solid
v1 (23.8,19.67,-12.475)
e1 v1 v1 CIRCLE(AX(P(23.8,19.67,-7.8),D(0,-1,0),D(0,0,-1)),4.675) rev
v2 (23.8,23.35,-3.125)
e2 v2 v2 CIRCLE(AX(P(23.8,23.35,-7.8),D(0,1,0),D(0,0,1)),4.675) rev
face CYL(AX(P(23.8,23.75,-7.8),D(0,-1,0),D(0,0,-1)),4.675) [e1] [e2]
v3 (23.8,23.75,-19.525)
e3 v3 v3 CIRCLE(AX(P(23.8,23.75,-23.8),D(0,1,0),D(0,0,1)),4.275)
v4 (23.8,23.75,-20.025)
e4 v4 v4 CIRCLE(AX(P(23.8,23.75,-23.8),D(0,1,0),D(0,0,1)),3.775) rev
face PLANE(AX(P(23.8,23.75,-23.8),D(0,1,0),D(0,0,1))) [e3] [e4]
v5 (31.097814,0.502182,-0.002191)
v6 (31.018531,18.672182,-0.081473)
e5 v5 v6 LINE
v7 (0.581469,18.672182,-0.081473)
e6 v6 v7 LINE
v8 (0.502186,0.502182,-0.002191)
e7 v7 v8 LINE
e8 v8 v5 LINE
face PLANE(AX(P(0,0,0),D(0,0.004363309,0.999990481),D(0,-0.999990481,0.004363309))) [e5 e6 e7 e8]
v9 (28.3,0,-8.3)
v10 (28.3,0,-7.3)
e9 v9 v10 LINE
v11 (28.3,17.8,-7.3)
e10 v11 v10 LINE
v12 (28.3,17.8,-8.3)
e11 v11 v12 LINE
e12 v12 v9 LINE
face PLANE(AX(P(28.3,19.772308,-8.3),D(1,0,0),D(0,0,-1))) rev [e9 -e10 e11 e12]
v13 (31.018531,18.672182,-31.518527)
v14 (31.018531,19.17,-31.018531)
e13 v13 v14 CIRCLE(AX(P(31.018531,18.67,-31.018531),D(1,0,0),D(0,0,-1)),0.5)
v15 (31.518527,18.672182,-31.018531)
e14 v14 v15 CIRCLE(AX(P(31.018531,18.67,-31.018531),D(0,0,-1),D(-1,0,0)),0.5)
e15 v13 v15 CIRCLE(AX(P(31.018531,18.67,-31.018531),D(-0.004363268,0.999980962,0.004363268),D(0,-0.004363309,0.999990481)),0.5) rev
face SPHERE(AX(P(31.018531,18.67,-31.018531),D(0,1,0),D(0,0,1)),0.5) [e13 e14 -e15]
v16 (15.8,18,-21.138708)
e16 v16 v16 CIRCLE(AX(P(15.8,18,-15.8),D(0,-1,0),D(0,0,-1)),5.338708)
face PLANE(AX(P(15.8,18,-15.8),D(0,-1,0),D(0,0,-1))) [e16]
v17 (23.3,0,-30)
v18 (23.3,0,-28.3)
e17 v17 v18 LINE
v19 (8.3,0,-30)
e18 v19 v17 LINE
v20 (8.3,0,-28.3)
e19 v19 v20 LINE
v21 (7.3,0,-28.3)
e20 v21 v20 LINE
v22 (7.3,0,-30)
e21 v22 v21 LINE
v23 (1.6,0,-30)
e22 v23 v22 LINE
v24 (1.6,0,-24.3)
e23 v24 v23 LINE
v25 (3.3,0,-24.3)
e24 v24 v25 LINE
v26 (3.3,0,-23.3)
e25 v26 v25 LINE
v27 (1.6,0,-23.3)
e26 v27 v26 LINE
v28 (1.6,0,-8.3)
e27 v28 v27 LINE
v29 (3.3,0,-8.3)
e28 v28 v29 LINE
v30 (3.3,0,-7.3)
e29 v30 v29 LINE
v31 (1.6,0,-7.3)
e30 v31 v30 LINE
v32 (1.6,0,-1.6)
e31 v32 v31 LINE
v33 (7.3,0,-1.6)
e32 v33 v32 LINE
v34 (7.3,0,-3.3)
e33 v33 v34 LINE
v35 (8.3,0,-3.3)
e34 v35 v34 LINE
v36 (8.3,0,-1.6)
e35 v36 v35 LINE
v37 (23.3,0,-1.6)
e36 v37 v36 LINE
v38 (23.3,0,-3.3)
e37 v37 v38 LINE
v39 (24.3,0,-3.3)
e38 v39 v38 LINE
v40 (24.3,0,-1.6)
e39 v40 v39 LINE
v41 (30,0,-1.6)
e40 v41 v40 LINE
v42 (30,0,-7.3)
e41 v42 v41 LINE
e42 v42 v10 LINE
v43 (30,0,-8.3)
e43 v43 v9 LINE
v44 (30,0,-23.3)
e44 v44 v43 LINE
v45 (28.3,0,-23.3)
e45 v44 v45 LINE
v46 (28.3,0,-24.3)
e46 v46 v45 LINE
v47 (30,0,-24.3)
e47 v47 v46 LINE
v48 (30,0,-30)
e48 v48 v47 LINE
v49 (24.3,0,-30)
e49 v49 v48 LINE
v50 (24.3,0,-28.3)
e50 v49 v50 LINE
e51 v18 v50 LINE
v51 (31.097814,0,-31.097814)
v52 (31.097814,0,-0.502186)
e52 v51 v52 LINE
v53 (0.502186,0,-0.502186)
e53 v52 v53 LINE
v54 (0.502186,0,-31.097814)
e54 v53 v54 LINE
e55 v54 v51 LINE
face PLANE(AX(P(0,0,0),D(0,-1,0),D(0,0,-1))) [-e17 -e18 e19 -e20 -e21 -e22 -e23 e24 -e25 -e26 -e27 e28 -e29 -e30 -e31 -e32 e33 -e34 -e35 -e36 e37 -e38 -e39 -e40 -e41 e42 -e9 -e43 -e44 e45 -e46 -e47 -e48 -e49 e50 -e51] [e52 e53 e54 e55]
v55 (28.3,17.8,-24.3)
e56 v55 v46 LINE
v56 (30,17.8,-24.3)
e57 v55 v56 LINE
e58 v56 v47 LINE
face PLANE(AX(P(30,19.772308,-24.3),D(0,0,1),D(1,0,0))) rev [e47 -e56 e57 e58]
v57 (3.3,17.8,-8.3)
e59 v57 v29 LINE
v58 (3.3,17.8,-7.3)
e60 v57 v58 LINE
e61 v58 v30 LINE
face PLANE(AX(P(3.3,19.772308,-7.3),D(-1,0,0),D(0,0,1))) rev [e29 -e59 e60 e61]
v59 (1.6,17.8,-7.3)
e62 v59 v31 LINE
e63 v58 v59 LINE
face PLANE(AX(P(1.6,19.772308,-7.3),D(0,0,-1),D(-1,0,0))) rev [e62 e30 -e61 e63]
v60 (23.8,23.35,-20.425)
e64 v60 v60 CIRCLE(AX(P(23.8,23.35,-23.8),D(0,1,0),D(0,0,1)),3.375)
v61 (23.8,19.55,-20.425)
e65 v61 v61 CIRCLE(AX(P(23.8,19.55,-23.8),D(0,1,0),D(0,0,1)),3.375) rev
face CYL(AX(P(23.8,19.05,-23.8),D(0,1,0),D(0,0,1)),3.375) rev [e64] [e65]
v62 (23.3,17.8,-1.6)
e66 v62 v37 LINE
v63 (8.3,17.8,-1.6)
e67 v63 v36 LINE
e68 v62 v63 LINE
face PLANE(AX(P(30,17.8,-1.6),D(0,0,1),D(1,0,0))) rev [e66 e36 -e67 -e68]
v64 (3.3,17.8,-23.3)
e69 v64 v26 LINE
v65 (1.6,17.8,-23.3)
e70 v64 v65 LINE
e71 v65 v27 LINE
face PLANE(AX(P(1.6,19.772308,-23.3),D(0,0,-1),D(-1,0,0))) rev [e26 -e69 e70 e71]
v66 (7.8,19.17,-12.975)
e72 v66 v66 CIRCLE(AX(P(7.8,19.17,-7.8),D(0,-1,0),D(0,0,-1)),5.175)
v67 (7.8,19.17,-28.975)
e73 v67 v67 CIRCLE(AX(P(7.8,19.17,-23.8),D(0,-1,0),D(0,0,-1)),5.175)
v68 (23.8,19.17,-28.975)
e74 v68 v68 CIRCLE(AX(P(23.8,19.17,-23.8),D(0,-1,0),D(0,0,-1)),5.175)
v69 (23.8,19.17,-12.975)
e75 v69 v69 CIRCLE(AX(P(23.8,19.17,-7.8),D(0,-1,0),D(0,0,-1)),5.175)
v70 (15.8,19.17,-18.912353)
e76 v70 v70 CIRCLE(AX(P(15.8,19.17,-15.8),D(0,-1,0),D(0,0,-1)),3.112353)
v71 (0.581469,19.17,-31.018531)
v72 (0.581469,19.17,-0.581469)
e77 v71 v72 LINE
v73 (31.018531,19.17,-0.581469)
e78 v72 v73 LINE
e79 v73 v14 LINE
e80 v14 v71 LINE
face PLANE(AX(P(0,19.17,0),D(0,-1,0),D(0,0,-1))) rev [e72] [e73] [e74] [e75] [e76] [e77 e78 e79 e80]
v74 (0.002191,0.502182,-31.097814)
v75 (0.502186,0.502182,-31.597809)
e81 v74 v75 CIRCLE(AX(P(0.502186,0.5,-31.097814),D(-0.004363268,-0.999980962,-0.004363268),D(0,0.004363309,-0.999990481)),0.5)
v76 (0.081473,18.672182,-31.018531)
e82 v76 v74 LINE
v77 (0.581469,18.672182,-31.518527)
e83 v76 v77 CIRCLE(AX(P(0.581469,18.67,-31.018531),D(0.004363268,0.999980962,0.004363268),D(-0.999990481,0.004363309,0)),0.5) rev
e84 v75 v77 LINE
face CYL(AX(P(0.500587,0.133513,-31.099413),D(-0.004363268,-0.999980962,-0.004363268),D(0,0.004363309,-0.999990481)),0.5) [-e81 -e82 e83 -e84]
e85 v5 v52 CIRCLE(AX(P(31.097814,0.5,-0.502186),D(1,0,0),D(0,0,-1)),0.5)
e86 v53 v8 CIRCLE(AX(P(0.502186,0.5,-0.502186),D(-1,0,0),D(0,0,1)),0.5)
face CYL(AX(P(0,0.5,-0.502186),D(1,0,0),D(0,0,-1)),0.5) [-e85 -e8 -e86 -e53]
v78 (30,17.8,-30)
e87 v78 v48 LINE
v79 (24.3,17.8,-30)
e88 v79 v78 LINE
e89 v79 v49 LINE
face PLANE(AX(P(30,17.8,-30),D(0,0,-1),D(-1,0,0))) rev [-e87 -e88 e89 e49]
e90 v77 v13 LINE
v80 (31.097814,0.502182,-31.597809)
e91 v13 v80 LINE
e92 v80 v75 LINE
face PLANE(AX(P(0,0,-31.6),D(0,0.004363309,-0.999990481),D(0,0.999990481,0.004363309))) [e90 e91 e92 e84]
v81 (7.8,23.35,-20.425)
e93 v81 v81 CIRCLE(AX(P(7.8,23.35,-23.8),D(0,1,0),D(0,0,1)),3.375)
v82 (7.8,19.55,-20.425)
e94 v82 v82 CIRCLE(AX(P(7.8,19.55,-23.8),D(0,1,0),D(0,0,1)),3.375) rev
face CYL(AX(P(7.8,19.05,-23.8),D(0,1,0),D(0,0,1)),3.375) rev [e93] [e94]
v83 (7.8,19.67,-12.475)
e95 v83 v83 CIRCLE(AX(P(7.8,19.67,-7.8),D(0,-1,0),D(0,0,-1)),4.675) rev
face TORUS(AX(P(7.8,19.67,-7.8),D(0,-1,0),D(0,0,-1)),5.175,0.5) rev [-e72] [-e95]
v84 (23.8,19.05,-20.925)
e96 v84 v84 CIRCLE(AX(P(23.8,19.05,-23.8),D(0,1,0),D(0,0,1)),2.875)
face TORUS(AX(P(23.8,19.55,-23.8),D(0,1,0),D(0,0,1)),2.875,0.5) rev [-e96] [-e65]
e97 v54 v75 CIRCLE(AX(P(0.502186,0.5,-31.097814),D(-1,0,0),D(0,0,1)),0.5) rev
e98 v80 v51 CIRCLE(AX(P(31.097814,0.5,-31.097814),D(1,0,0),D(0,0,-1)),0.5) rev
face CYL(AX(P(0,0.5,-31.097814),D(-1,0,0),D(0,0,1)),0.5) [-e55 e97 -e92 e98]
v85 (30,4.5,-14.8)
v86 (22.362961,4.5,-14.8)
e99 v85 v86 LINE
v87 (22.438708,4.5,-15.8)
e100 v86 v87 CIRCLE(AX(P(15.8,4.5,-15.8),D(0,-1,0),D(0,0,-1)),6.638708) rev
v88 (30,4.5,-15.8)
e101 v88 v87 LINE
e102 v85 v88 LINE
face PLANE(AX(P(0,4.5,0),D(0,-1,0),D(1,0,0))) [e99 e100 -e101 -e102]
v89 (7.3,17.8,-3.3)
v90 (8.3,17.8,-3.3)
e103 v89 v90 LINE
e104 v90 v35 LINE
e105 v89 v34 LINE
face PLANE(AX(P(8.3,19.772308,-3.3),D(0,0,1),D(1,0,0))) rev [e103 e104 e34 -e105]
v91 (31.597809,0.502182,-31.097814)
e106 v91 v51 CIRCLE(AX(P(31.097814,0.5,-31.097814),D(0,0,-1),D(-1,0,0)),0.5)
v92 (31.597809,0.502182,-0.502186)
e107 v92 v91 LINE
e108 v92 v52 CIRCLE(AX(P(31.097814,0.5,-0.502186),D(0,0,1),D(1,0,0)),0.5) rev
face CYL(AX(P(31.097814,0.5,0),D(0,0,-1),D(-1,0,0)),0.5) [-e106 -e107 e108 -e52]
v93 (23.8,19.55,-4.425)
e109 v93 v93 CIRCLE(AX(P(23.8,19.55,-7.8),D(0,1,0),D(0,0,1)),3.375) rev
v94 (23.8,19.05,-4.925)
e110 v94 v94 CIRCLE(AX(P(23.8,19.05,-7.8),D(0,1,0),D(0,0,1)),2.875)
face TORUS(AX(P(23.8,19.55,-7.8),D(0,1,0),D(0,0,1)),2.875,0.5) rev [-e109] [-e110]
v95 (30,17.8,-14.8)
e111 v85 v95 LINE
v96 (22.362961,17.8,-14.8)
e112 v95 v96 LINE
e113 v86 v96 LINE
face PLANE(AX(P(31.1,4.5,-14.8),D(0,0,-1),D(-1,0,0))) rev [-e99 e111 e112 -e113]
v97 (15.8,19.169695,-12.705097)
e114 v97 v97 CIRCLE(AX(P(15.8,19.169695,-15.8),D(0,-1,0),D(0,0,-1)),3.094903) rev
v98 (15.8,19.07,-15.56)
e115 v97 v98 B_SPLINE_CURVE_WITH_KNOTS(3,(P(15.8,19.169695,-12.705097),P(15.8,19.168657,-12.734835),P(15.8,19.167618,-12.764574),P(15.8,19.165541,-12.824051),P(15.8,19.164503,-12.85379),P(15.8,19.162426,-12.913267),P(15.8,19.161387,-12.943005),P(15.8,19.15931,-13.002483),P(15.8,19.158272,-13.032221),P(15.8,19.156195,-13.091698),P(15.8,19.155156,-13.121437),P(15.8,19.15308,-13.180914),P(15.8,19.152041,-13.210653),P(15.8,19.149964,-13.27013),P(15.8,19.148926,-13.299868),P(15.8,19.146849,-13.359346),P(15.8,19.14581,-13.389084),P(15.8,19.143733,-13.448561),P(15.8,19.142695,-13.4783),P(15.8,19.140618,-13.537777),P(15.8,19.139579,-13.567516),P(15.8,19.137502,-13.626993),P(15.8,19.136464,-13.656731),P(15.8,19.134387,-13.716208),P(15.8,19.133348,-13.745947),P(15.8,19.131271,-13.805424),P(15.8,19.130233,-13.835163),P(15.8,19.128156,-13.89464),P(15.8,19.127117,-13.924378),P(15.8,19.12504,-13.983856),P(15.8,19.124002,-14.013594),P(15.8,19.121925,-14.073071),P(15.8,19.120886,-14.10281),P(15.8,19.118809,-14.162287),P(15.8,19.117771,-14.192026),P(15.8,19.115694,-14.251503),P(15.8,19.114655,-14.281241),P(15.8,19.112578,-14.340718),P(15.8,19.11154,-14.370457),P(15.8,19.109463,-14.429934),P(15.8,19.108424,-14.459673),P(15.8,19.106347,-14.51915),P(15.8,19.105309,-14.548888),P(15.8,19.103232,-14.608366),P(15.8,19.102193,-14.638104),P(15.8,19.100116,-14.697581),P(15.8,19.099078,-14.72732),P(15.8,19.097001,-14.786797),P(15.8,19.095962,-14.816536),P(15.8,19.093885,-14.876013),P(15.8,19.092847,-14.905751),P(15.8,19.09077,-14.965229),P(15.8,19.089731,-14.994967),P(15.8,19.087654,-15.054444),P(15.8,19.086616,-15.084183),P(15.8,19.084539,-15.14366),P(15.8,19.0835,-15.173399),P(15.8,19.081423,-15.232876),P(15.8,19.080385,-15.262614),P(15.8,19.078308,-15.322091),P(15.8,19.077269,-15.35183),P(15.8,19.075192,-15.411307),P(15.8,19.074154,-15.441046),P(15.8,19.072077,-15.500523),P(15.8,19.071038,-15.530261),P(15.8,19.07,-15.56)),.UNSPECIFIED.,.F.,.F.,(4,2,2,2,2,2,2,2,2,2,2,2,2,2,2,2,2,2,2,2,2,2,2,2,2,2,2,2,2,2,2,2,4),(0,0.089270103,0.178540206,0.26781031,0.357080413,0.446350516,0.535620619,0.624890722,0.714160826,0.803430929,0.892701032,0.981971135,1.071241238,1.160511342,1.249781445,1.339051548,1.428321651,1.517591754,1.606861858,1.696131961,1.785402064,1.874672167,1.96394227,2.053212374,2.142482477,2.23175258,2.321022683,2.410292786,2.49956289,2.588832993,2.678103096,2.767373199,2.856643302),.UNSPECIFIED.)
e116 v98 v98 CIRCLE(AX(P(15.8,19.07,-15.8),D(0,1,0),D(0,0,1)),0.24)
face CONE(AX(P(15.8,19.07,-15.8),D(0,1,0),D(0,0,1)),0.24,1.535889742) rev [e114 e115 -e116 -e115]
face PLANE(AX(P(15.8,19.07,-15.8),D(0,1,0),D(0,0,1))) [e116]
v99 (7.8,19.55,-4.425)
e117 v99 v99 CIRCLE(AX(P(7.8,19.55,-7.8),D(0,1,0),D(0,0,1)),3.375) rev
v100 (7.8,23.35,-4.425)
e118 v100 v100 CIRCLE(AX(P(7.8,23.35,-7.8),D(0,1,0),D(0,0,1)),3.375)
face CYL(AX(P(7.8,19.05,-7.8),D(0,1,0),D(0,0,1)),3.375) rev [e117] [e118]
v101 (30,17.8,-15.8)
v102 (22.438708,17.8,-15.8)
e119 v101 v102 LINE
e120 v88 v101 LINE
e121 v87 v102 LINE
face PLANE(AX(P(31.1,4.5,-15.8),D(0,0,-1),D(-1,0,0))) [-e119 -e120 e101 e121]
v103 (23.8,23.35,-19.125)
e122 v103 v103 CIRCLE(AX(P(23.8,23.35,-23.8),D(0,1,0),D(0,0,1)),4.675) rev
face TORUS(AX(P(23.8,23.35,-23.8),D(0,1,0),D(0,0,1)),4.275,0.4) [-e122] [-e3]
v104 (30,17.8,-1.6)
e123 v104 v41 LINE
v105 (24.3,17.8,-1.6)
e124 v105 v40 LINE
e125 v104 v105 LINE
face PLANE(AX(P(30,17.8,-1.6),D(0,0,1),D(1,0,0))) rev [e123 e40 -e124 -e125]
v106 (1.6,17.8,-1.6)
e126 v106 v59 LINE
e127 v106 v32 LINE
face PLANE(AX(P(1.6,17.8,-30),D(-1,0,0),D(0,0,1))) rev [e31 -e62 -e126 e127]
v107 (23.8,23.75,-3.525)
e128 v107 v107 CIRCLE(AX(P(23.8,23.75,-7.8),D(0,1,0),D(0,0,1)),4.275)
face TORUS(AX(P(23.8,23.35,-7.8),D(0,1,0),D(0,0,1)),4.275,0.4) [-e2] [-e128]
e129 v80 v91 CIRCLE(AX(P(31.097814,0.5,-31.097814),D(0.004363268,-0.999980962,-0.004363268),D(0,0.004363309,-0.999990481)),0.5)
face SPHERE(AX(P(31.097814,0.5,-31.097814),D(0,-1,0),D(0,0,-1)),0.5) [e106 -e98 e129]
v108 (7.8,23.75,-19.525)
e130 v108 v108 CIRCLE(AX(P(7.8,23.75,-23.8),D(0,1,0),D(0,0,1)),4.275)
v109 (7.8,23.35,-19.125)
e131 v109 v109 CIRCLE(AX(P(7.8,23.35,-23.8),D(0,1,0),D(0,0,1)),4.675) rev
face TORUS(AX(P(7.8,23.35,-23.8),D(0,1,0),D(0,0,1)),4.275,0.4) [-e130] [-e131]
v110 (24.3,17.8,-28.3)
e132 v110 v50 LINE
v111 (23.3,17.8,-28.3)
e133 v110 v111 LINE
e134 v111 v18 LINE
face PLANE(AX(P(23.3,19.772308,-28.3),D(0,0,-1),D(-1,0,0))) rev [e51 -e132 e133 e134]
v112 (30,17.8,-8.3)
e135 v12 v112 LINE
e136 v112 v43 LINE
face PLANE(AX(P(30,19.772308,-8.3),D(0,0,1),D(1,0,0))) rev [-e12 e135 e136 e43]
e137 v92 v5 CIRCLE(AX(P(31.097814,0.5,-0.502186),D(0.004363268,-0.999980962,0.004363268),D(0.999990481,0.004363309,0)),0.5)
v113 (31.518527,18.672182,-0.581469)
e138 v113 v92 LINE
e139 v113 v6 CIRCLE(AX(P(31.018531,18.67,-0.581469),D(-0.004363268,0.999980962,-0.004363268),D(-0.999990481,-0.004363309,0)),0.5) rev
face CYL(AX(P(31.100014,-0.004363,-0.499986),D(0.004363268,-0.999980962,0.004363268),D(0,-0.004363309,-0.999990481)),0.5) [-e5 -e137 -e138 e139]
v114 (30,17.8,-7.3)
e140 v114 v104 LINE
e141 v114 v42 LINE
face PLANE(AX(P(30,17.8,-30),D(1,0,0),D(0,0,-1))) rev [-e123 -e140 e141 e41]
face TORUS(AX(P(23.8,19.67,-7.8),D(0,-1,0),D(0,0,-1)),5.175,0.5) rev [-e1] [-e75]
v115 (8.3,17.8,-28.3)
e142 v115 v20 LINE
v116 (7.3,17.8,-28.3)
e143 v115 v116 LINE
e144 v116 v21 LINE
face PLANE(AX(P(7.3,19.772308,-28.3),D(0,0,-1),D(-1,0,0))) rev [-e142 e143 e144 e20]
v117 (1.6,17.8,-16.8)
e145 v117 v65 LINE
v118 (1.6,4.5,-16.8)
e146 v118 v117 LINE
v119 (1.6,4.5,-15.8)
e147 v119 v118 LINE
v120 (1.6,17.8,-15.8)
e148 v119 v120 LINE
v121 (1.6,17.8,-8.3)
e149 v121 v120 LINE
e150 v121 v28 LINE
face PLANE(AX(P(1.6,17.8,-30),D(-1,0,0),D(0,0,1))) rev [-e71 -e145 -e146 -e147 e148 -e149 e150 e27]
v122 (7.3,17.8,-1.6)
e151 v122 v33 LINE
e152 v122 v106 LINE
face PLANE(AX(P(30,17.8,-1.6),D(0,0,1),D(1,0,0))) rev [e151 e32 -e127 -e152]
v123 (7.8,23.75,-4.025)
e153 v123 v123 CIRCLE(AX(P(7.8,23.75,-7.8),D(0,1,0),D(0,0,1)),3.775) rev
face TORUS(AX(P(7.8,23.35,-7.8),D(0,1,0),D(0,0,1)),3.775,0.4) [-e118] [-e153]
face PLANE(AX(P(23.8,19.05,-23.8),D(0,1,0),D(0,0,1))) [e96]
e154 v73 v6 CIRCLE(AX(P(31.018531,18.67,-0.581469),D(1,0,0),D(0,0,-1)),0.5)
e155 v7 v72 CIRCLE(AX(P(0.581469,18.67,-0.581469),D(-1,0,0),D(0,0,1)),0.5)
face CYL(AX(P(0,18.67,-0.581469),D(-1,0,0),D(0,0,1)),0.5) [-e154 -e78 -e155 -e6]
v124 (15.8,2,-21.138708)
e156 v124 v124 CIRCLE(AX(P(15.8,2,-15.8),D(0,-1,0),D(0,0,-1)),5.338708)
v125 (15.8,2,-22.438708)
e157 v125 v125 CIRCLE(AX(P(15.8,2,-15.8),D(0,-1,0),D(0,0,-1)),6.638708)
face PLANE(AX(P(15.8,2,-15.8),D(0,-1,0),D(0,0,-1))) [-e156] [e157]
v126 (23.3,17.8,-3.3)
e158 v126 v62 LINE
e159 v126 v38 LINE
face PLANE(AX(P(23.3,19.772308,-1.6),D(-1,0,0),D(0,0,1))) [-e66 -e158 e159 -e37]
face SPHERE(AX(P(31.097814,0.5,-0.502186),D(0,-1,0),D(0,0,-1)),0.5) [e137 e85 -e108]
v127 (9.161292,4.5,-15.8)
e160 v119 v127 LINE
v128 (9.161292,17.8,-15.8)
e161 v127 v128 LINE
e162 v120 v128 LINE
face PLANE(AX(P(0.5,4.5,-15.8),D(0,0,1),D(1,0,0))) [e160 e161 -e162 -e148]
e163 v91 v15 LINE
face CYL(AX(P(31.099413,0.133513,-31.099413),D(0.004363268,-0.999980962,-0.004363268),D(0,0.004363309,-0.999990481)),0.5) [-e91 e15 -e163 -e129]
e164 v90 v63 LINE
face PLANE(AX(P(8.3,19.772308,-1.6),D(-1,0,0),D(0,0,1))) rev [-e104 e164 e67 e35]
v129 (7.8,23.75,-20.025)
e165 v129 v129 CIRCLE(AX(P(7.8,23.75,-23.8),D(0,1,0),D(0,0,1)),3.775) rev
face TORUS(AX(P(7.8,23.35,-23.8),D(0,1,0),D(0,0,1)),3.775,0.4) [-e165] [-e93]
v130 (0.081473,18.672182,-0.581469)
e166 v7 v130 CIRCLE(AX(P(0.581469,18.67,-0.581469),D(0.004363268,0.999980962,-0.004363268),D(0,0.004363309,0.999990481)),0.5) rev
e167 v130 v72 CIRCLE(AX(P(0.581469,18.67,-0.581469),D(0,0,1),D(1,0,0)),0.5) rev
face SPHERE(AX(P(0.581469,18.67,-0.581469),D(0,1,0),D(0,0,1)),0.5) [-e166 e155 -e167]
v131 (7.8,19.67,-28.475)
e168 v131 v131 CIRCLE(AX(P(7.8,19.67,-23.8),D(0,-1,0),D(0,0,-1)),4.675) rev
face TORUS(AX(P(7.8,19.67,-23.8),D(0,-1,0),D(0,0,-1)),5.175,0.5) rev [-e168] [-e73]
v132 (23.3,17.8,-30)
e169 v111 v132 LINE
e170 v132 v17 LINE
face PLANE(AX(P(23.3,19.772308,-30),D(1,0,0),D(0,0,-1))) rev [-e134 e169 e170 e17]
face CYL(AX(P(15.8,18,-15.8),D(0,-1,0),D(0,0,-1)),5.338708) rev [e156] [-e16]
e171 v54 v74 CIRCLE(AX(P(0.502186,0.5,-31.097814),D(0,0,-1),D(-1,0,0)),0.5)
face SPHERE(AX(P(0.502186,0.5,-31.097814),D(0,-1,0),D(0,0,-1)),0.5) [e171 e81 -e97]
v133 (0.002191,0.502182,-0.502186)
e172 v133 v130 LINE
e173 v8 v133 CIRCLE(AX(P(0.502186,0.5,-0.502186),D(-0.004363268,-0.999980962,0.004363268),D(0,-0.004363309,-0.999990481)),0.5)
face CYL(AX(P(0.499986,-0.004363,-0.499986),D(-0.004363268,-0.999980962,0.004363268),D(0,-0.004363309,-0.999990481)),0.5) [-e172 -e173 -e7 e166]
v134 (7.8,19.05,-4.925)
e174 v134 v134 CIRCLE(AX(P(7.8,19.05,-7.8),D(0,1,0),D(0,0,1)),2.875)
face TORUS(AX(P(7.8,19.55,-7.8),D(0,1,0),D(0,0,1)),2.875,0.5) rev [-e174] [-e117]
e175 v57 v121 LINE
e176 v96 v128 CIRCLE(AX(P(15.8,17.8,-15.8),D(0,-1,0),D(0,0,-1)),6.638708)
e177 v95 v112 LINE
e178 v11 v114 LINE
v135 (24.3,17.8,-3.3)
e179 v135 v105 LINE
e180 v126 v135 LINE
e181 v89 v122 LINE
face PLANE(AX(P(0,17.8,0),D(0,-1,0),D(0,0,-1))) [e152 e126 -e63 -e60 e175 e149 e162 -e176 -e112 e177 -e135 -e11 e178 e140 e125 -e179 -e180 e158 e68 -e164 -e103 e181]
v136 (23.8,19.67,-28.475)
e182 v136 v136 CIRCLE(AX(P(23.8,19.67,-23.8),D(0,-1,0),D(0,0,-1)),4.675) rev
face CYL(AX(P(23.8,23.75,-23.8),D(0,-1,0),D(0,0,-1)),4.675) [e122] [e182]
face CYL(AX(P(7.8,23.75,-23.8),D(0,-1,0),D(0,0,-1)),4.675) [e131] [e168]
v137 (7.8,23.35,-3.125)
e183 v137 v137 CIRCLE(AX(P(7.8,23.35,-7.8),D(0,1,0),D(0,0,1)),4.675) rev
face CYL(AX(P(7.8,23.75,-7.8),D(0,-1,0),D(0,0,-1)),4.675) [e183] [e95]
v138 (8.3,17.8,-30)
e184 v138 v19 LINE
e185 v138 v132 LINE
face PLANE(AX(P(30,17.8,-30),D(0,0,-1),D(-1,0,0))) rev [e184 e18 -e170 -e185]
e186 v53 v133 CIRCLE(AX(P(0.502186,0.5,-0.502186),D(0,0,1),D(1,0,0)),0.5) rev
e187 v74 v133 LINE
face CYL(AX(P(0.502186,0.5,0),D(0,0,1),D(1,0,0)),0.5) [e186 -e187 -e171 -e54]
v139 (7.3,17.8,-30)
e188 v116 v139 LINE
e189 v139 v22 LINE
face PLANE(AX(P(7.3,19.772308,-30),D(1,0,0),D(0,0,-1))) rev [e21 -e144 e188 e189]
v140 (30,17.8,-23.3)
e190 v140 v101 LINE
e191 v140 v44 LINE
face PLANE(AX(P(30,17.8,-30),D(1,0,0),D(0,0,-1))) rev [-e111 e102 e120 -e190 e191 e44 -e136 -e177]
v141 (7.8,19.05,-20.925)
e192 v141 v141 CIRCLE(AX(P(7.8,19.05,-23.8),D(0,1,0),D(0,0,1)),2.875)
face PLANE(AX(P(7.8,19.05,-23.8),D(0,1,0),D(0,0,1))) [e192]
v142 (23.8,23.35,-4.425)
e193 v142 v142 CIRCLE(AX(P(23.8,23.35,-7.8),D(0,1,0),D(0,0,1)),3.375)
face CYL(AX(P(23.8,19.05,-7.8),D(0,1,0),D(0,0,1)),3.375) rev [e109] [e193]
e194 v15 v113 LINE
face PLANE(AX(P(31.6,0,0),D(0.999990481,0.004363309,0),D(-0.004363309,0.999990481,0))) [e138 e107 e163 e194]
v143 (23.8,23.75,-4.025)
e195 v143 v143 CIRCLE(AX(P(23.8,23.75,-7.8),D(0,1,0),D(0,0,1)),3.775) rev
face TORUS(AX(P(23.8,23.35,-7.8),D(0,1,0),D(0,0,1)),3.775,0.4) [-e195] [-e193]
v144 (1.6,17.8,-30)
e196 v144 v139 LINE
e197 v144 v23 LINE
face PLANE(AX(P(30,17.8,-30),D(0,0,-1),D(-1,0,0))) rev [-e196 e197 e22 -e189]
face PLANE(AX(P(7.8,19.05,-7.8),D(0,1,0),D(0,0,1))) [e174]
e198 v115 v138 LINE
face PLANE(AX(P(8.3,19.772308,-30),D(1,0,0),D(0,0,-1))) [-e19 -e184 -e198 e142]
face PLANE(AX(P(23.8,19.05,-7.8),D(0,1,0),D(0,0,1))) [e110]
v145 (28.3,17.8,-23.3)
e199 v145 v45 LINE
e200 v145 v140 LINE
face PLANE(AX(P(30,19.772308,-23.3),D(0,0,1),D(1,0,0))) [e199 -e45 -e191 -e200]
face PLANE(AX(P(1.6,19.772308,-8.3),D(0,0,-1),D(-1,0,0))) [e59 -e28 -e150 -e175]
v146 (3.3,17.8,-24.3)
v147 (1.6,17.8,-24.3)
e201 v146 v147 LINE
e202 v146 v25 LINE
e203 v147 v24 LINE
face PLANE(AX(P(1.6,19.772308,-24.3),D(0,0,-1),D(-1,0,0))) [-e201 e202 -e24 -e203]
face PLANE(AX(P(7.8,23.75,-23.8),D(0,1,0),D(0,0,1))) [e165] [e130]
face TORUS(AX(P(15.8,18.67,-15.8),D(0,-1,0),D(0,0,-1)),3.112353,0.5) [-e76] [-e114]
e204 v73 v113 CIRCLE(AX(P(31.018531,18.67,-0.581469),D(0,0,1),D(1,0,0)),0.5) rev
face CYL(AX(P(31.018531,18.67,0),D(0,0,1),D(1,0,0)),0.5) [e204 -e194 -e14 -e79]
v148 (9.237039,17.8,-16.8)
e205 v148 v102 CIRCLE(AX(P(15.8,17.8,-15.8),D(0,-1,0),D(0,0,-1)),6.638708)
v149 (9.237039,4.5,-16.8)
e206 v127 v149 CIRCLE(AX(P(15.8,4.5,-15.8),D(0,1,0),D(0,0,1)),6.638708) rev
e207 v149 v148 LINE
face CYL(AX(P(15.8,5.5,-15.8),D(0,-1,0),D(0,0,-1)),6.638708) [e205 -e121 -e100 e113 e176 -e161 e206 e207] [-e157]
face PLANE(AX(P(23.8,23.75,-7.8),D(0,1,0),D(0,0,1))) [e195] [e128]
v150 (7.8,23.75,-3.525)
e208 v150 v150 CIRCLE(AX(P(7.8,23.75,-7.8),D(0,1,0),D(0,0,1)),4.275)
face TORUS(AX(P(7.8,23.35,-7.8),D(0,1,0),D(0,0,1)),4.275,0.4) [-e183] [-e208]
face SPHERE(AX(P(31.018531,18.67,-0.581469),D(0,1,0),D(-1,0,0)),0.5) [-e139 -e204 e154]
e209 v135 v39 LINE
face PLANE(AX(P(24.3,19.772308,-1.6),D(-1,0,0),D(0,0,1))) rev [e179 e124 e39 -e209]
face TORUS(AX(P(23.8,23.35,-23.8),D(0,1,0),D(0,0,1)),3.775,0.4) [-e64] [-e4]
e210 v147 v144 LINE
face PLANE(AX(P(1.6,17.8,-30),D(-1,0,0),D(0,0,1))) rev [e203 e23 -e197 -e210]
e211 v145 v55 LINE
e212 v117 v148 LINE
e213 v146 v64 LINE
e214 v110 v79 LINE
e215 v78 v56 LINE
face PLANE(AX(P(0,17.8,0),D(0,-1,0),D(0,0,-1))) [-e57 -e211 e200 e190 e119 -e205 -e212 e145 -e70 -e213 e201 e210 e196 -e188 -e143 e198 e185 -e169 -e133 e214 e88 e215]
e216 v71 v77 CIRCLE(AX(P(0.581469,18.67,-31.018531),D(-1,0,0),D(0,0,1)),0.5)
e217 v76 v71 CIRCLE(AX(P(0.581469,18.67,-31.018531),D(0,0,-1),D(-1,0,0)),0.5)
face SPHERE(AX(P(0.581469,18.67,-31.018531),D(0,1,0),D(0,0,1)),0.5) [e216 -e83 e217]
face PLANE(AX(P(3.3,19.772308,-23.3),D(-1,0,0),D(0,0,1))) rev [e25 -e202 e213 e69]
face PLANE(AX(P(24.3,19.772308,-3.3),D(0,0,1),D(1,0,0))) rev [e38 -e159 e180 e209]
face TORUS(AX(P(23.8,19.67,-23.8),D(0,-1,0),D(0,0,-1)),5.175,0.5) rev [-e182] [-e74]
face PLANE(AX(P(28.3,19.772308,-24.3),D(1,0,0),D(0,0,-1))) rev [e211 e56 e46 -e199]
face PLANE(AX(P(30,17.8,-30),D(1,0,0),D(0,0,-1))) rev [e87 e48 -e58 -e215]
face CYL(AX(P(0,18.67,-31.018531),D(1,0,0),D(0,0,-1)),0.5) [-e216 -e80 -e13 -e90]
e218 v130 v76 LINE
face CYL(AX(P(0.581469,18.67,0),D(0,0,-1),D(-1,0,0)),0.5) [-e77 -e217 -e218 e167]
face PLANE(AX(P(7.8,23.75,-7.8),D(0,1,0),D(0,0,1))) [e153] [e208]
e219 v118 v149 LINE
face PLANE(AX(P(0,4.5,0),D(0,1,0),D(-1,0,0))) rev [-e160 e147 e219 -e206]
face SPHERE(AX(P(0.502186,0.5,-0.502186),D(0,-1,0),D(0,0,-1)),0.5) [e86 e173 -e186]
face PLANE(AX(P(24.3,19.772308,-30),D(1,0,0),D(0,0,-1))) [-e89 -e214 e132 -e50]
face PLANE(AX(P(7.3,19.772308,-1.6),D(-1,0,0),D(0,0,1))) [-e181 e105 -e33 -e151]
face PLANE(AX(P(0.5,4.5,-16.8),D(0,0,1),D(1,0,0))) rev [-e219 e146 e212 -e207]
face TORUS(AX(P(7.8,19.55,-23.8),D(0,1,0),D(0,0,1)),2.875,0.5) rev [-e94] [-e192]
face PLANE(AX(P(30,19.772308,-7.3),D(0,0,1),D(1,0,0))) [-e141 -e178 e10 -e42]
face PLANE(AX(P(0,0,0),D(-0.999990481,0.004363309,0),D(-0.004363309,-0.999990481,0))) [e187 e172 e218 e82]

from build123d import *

# Parameters (mm, degrees)
SKETCH1_W           = 31.6
SKETCH1_H           = 31.6
BOSS_EXTRUDE1_DEPTH = 19.17
BOSS_EXTRUDE1_TAPER = 0.25
SKETCH2_R           = 4.675
BOSS_EXTRUDE2_DEPTH = 4.58
SKETCH3_R           = 6.638708499
CUT_EXTRUDE1_DEPTH  = 5.5
SKETCH4_R           = 6.638708499
CUT_EXTRUDE2_DEPTH  = 2
SKETCH5_R           = 3.375
CUT_EXTRUDE3_DEPTH  = 4.7
SKETCH6_R           = 5.338708499
CUT_EXTRUDE4_DEPTH  = 16
SKETCH7_W           = 28.4
SKETCH7_H           = 28.4
SKETCH7_R           = 6.638708499
CUT_EXTRUDE5_DEPTH  = 17.8
SKETCH9_W           = 1
SKETCH9_H           = 1.7
SKETCH9_W_2         = 1.7
SKETCH9_H_2         = 1
EXTRUDE_THIN1_DEPTH = 17.8
SKETCH10_W          = 9.161291501
SKETCH10_H          = 1
EXTRUDE_THIN2_DEPTH = 13.3
SKETCH12_R          = 3.24
CUT_EXTRUDE6_DEPTH  = 0.1
CHAMFER1_SIZE       = 0.104762308
CHAMFER1_SIZE_2     = 3
FILLET2_R           = 0.5
FILLET4_R           = 0.4


with BuildPart() as part:
    # Sketch1 → Boss-Extrude1 (new body)
    with BuildSketch(Plane(origin=(0, 0, 0), x_dir=(1, 0, 0), z_dir=(0, 1, 0))):
        with Locations((15.8, 15.8)):
            Rectangle(SKETCH1_W, SKETCH1_H)
    extrude(amount=BOSS_EXTRUDE1_DEPTH, taper=BOSS_EXTRUDE1_TAPER)

    # Sketch2 → Boss-Extrude2 (add)
    with BuildSketch(Plane(origin=(0, 19.17, 0), x_dir=(1, 0, 0), z_dir=(0, 1, 0))):
        with Locations(Location((7.8, 23.8, 0), (0, 0, 90))):
            Circle(SKETCH2_R)
        with Locations(Location((23.8, 7.8, 0), (0, 0, 90))):
            Circle(SKETCH2_R)
        with Locations(Location((7.8, 7.8, 0), (0, 0, 90))):
            Circle(SKETCH2_R)
        with Locations(Location((23.8, 23.8, 0), (0, 0, 90))):
            Circle(SKETCH2_R)
    extrude(amount=BOSS_EXTRUDE2_DEPTH)

    # Sketch3 → Cut-Extrude1 (cut)
    with BuildSketch(Plane.XZ):
        Polygon((6.8, -3.125), (8.8, -3.125), (9.425, -2.5), (22.175, -2.5), (22.8, -3.125), (24.8, -3.125), (25.425, -2.5), (29.1, -2.5), (29.1, -6.175), (28.475, -6.8), (28.475, -8.8), (29.1, -9.425), (29.1, -22.175), (28.475, -22.8), (28.475, -24.8), (29.1, -25.425), (29.1, -29.1), (25.425, -29.1), (24.8, -28.475), (22.8, -28.475), (22.175, -29.1), (9.425, -29.1), (8.8, -28.475), (6.8, -28.475), (6.175, -29.1), (2.5, -29.1), (2.5, -25.425), (3.125, -24.8), (3.125, -22.8), (2.5, -22.175), (2.5, -9.425), (3.125, -8.8), (3.125, -6.8), (2.5, -6.175), (2.5, -2.5), (6.175, -2.5), align=None)
        with Locations(Location((15.8, -15.8, 0), (0, 0, 270))):
            Circle(SKETCH3_R, mode=Mode.SUBTRACT)
    extrude(amount=-CUT_EXTRUDE1_DEPTH, mode=Mode.SUBTRACT)

    # Sketch4 → Cut-Extrude2 (cut)
    with BuildSketch(Plane.XZ):
        with Locations(Location((15.8, -15.8, 0), (0, 0, 270))):
            Circle(SKETCH4_R)
    extrude(amount=-CUT_EXTRUDE2_DEPTH, mode=Mode.SUBTRACT)

    # Sketch5 → Cut-Extrude3 (cut)
    with BuildSketch(Plane(origin=(0, 23.75, 0), x_dir=(1, 0, 0), z_dir=(0, 1, 0))):
        with Locations(Location((7.8, 23.8, 0), (0, 0, 270))):
            Circle(SKETCH5_R)
        with Locations(Location((23.8, 23.8, 0), (0, 0, 270))):
            Circle(SKETCH5_R)
        with Locations(Location((7.8, 7.8, 0), (0, 0, 270))):
            Circle(SKETCH5_R)
        with Locations(Location((23.8, 7.8, 0), (0, 0, 270))):
            Circle(SKETCH5_R)
    extrude(amount=-CUT_EXTRUDE3_DEPTH, mode=Mode.SUBTRACT)

    # Sketch6 → Cut-Extrude4 (cut)
    with BuildSketch(Plane.XZ.offset(-2)):
        with Locations(Location((15.8, -15.8, 0), (0, 0, 270))):
            Circle(SKETCH6_R)
    extrude(amount=-CUT_EXTRUDE4_DEPTH, mode=Mode.SUBTRACT)

    # Sketch7 → Cut-Extrude5 (cut)
    with BuildSketch(Plane.XZ):
        with Locations((15.8, -15.8)):
            Rectangle(SKETCH7_W, SKETCH7_H)
        with Locations(Location((15.8, -15.8, 0), (0, 0, 270))):
            Circle(SKETCH7_R, mode=Mode.SUBTRACT)
    extrude(amount=-CUT_EXTRUDE5_DEPTH, mode=Mode.SUBTRACT)

    # Sketch9 → Extrude-Thin1 (add)
    with BuildSketch(Plane.XZ):
        with Locations((7.8, -2.45)):
            Rectangle(SKETCH9_W, SKETCH9_H)
        with Locations((23.8, -2.45)):
            Rectangle(SKETCH9_W, SKETCH9_H)
        with Locations((29.15, -7.8)):
            Rectangle(SKETCH9_W_2, SKETCH9_H_2)
        with Locations((29.15, -23.8)):
            Rectangle(SKETCH9_W_2, SKETCH9_H_2)
        with Locations((23.8, -29.15)):
            Rectangle(SKETCH9_W, SKETCH9_H)
        with Locations((7.8, -29.15)):
            Rectangle(SKETCH9_W, SKETCH9_H)
        with Locations((2.45, -23.8)):
            Rectangle(SKETCH9_W_2, SKETCH9_H_2)
        with Locations((2.45, -7.8)):
            Rectangle(SKETCH9_W_2, SKETCH9_H_2)
    extrude(amount=-EXTRUDE_THIN1_DEPTH)

    # Sketch10 → Extrude-Thin2 (add)
    with BuildSketch(Plane.XZ.offset(-17.8)):
        with Locations((5.080645751, -16.3)):
            Rectangle(SKETCH10_W, SKETCH10_H)
        with Locations((26.51935425, -15.3)):
            Rectangle(SKETCH10_W, SKETCH10_H)
    extrude(amount=EXTRUDE_THIN2_DEPTH)

    # Sketch12 → Cut-Extrude6 (cut)
    with BuildSketch(Plane(origin=(0, 19.17, 0), x_dir=(1, 0, 0), z_dir=(0, 1, 0))):
        with Locations(Location((15.8, 15.8, 0), (0, 0, 270))):
            Circle(SKETCH12_R)
    extrude(amount=-CUT_EXTRUDE6_DEPTH, mode=Mode.SUBTRACT)

    # Chamfer1
    # the kernel refuses this chamfer: 3, 0.104762308 mm, written as the material it adds along each edge
    with BuildSketch(Plane(origin=(15.8, 19.07, -15.8), x_dir=(0, 0, 1), z_dir=(-1, 0, 0))) as chamfer1_piece_1_section:
        Polygon((3.24, CHAMFER1_SIZE * 1.00000000454), (3.24 - CHAMFER1_SIZE_2, 0), (3.24, 0), align=None)
    chamfer1_piece_1 = revolve(axis=Axis((15.8, 19.07, -15.8), (0, 1, 0)), mode=Mode.PRIVATE)
    chamfer1_piece_1 = split(chamfer1_piece_1, bisect_by=Plane(origin=(15.8, 19.17, -17.412418994), z_dir=(0, -1, 0)), keep=Keep.TOP, mode=Mode.PRIVATE)
    add(chamfer1_piece_1)

    # Fillet2
    fillet2_edges = [part.edges().sort_by_distance(p)[0] for p in [
        (31.516354565, 19.17, -15.8),
        (7.8, 19.05, -27.175),
        (7.8, 19.05, -11.175),
        (23.8, 19.05, -11.175),
        (23.8, 19.05, -27.175),
        (7.8, 19.17, -19.125),
        (15.8, 19.17, -31.516354565),
        (23.8, 19.17, -3.125),
        (7.8, 19.17, -3.125),
        (23.8, 19.17, -19.125),
        (15.8, 19.17, -18.903625328),
        (0.083645435, 19.17, -15.8),
        (15.8, 0, -31.6),
        (31.6, 0, -15.8),
        (15.8, 0, 0),
        (0, 0, -15.8),
        (0.041822718, 9.585, -31.558177282),
        (31.558177282, 9.585, -31.558177282),
        (31.558177282, 9.585, -0.041822718),
        (0.041822718, 9.585, -0.041822718),
        (15.8, 19.17, -0.083645435),
    ]]
    fillet(fillet2_edges, radius=FILLET2_R)

    # Fillet4
    fillet4_edges = [part.edges().sort_by_distance(p)[0] for p in [
        (7.8, 23.75, -27.175),
        (7.8, 23.75, -11.175),
        (23.8, 23.75, -11.175),
        (23.8, 23.75, -27.175),
        (7.8, 23.75, -19.125),
        (23.8, 23.75, -3.125),
        (7.8, 23.75, -3.125),
        (23.8, 23.75, -19.125),
    ]]
    fillet(fillet4_edges, radius=FILLET4_R)


solid = part.part
